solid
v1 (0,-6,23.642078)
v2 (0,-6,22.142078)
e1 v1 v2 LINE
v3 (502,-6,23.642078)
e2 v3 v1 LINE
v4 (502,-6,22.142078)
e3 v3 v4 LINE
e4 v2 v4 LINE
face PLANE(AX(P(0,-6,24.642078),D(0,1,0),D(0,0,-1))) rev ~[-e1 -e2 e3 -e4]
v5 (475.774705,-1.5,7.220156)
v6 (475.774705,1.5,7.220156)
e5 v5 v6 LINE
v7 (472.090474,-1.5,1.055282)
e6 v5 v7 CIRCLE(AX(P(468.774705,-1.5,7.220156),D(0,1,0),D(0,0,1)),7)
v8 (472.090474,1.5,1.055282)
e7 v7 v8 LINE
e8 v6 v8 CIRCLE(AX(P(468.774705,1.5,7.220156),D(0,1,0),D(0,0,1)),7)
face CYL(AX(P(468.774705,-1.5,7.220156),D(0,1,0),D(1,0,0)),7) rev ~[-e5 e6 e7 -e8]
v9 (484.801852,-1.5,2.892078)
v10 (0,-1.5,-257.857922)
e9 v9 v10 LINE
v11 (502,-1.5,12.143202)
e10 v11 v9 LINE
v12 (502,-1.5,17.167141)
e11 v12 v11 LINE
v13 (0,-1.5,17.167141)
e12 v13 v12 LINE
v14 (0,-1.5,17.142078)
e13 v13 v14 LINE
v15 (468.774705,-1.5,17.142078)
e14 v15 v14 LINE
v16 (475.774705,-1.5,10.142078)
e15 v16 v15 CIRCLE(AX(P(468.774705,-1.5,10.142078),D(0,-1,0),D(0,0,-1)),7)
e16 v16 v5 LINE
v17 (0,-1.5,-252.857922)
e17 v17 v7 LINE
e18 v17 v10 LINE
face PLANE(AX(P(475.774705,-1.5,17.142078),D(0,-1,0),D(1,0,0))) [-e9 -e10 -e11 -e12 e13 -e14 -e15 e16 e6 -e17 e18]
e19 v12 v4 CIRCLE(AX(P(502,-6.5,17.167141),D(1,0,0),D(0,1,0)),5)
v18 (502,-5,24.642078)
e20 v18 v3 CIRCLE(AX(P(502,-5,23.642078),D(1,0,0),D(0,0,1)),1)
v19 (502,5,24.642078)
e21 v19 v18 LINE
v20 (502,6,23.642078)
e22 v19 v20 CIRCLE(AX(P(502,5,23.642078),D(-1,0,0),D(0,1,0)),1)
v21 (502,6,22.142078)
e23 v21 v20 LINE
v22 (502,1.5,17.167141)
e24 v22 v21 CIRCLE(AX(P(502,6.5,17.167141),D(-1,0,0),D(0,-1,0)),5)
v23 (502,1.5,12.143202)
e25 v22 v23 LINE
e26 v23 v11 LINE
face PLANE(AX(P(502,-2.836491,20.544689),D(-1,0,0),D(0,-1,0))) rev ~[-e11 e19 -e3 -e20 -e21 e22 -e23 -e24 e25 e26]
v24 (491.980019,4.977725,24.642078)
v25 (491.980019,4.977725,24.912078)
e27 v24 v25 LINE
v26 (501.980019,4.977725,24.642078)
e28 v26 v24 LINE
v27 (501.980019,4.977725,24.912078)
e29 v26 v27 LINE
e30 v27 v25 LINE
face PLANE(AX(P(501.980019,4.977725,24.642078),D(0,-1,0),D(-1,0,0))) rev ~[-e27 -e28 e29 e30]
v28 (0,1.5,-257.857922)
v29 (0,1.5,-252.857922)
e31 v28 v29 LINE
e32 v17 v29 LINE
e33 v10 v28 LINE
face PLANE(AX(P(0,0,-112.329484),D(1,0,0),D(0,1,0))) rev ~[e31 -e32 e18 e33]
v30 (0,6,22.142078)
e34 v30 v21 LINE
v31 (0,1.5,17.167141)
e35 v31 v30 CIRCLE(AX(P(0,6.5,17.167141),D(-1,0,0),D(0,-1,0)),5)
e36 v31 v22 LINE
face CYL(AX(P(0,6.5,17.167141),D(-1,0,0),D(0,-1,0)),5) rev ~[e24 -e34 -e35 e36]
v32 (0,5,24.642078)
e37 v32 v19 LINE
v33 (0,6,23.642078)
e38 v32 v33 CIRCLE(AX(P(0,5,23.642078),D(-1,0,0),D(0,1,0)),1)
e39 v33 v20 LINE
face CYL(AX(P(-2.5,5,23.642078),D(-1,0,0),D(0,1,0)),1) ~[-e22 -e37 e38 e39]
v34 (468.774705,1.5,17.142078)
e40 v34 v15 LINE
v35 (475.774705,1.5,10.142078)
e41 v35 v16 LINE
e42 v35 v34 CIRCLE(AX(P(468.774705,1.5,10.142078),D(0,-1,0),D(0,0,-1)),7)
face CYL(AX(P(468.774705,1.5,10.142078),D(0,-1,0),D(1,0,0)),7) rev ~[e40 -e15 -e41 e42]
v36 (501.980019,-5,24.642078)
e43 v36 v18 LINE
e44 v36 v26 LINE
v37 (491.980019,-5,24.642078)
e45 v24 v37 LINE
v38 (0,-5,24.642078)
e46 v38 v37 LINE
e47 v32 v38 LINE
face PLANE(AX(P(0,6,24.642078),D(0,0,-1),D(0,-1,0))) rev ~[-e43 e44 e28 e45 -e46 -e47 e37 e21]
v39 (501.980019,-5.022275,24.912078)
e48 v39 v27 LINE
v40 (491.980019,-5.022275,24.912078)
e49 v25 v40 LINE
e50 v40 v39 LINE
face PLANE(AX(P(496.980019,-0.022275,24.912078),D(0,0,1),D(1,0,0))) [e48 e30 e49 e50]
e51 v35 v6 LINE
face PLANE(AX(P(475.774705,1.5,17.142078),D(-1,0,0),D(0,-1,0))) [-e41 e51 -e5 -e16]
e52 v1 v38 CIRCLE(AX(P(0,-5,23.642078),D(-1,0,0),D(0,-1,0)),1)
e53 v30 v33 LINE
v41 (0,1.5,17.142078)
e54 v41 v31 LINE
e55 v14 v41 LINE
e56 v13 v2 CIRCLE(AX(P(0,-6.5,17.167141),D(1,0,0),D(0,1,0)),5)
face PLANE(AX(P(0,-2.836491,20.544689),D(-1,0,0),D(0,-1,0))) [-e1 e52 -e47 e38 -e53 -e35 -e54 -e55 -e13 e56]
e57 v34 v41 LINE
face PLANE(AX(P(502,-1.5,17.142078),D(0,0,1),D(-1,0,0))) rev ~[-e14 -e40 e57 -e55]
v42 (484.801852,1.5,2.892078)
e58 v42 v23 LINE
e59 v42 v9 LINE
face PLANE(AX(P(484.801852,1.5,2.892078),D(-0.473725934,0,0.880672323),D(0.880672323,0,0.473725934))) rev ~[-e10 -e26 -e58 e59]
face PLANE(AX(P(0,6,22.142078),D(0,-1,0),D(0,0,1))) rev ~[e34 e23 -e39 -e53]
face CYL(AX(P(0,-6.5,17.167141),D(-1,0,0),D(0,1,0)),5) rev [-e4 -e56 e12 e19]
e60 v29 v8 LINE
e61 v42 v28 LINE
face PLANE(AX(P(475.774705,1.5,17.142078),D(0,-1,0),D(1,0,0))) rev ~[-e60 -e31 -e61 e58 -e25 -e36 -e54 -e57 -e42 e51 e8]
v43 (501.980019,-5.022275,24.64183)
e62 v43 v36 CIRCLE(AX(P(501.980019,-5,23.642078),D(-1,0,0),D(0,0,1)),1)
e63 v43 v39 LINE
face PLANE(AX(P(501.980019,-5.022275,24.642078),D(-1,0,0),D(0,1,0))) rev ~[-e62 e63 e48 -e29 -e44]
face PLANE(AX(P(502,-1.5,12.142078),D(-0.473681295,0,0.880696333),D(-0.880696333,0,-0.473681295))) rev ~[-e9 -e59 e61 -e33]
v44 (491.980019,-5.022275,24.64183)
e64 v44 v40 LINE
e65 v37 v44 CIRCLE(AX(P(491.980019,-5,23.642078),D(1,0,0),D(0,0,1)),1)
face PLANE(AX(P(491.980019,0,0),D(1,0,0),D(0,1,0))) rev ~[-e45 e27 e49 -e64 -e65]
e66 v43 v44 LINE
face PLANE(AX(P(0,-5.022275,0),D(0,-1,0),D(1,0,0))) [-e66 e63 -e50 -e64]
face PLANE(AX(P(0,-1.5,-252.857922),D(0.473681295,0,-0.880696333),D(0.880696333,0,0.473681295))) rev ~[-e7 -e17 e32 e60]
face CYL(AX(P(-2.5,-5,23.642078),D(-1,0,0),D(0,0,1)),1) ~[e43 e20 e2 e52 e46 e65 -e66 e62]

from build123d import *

# Parameters (mm, degrees)
F1_DEPTH      = 502
F3_DEPTH      = 406
F4_DEPTH      = 143
F5_W          = 26.22529459
F5_H          = 3
F6_DEPTH      = 14.25
F6_DEPTH_BACK = 0.8
F8_DEPTH      = 25
F10_DEPTH     = 0.27
F11_R         = 7
F12_R         = 7
F13_T1_DEPTH  = 502
F14_T1_DEPTH  = 502
F15_T1_DEPTH  = 507
F15_T6_DEPTH  = 507
F15_T12_DEPTH = 507
F15_T18_DEPTH = 507
F15_T25_DEPTH = 507
F15_T31_DEPTH = 507


# Not quite as in the source:
# - a fillet or chamfer that OpenCascade refuses, or shapes differently, is made with other operations: its cross-section is extruded or revolved along the edge and cut away or added
# - a feature names something its author has since deleted; it is built from what else it names


with BuildPart() as f1:
    # F0 (on Right) → F1 (new body)
    with BuildSketch(Plane.YZ):
        Polygon((6, 24.6420782059), (-6, 24.6420782059), (-6, 22.1420782059), (-1.5, 22.1420782059), (-1.5, -257.8579217941), (1.5, -257.8579217941), (1.5, 22.1420782059), (6, 22.1420782059), align=None)
    extrude(amount=F1_DEPTH)

    # F2 (on face) → F3 (cut)
    with BuildSketch(Plane.XZ.offset(1.5)):
        Polygon((0, -252.8579217941), (502, 17.1420782059), (0, 17.1420782059), align=None)
    extrude(amount=-F3_DEPTH, mode=Mode.SUBTRACT)

    # F2 (on face) → F4 (cut)
    with BuildSketch(Plane.XZ.offset(1.5)):
        Polygon((502, -257.8579217941), (502, 12.1420782059), (0, -257.8579217941), align=None)
    extrude(amount=-F4_DEPTH, mode=Mode.SUBTRACT)

    # F5 (on face) → F6 (join, two sides)
    with BuildSketch(Plane(origin=(0, 0, 17.1420782059), x_dir=(1, 0, 0), z_dir=(0, 0, -1))) as f6_sk:
        with Locations((488.887352705, 0)):
            Rectangle(F5_W, F5_H)
    extrude(amount=F6_DEPTH)
    extrude(f6_sk.sketch, amount=-F6_DEPTH_BACK)

    # F7 (on face) → F8 (cut)
    with BuildSketch(Plane(origin=(0, 1.5, 0), x_dir=(-1, 0, 0), z_dir=(0, 1, 0))):
        Polygon((-484.8018518519, 2.8920782059), (-502, 12.143202126), (-502, 2.8920782059), align=None)
    extrude(amount=-F8_DEPTH, mode=Mode.SUBTRACT)

    # F9 (on face) → F10 (join)
    with BuildSketch(Plane.XY.offset(24.6420782059)):
        Polygon((501.9800190187, -5.0222751118), (501.9800190187, 4.9777248882), (497.843503952, 4.9777248882), (491.9800190187, 4.9777248882), (491.9800190187, -5.0222751118), (496.5066611767, -5.0222751118), align=None)
    extrude(amount=F10_DEPTH)

    # F11
    f11_edges = [f1.edges().sort_by_distance(p)[0] for p in [
        (475.774705, 0, 17.142078),
    ]]
    fillet(f11_edges, radius=F11_R)

    # F12
    f12_edges = [f1.edges().sort_by_distance(p)[0] for p in [
        (475.774705, 0, 3.03684),
    ]]
    fillet(f12_edges, radius=F12_R)

    # F13: fillet of radius 5 on 1 edges, made by hand

    # F13_s2 → F13_t1 (join)
    with BuildSketch(Plane.YZ):
        with BuildLine():
            ThreePointArc((1.5, 17.1671410204), (2.7919007565, 20.5212429867), (6, 22.1420782059))
            Line((6, 22.1420782059), (1.5, 22.1420782059))
            Line((1.5, 22.1420782059), (1.5, 17.1671410204))
        make_face()
    extrude(amount=F13_T1_DEPTH)

    # F14: fillet of radius 5 on 1 edges, made by hand

    # F14_s2 → F14_t1 (join)
    with BuildSketch(Plane.YZ):
        with BuildLine():
            ThreePointArc((-1.5, 17.1671410204), (-2.7919007565, 20.5212429867), (-6, 22.1420782059))
            Line((-6, 22.1420782059), (-1.5, 22.1420782059))
            Line((-1.5, 22.1420782059), (-1.5, 17.1671410204))
        make_face()
    extrude(amount=F14_T1_DEPTH)

    # F15: fillet of radius 1 on 2 edges, made by hand

    # F15_s2 → F15_t1 (cut)
    with BuildSketch(Plane.YZ.offset(-2.5)):
        with BuildLine():
            ThreePointArc((6, 23.6420782059), (5.7071067812, 24.3491849871), (5, 24.6420782059))
            Line((5, 24.6420782059), (6, 24.6420782059))
            Line((6, 24.6420782059), (6, 23.6420782059))
        make_face()
    extrude(amount=F15_T1_DEPTH, mode=Mode.SUBTRACT)


with BuildPart() as f15_tool4:
    # F15_s5 → F15_t6 (new body)
    with BuildSketch(Plane.YZ.offset(-2.5)):
        with BuildLine():
            ThreePointArc((-5, 24.6420782059), (-5.7071067812, 24.3491849871), (-6, 23.6420782059))
            Line((-6, 23.6420782059), (-6, 24.6420782059))
            Line((-6, 24.6420782059), (-5, 24.6420782059))
        make_face()
    extrude(amount=F15_T6_DEPTH)

    split(bisect_by=Plane.YZ.offset(491.9800190187), keep=Keep.BOTTOM)

    split(bisect_by=Plane.XZ.offset(5.0222751118), keep=Keep.BOTTOM)


with BuildPart() as f1_1:
    add(f1.part)

    # F15_t3: cut F15_tool4
    add(f15_tool4.part, mode=Mode.SUBTRACT)


with BuildPart() as f15_tool10:
    # F15_s11 → F15_t12 (new body)
    with BuildSketch(Plane.YZ.offset(-2.5)):
        with BuildLine():
            ThreePointArc((-5, 24.6420782059), (-5.7071067812, 24.3491849871), (-6, 23.6420782059))
            Line((-6, 23.6420782059), (-6, 24.6420782059))
            Line((-6, 24.6420782059), (-5, 24.6420782059))
        make_face()
    extrude(amount=F15_T12_DEPTH)

    split(bisect_by=Plane.YZ.offset(491.9800190187), keep=Keep.BOTTOM)

    split(bisect_by=Plane.XZ.offset(5.0222751118), keep=Keep.TOP)


with BuildPart() as f1_2:
    add(f1_1.part)

    # F15_t9: cut F15_tool10
    add(f15_tool10.part, mode=Mode.SUBTRACT)


with BuildPart() as f15_tool16:
    # F15_s17 → F15_t18 (new body)
    with BuildSketch(Plane.YZ.offset(-2.5)):
        with BuildLine():
            ThreePointArc((-5, 24.6420782059), (-5.7071067812, 24.3491849871), (-6, 23.6420782059))
            Line((-6, 23.6420782059), (-6, 24.6420782059))
            Line((-6, 24.6420782059), (-5, 24.6420782059))
        make_face()
    extrude(amount=F15_T18_DEPTH)

    split(bisect_by=Plane.YZ.offset(491.9800190187), keep=Keep.TOP)

    split(bisect_by=Plane.YZ.offset(501.9800190187), keep=Keep.BOTTOM)

    split(bisect_by=Plane.XZ.offset(5.0222751118), keep=Keep.TOP)


with BuildPart() as f1_3:
    add(f1_2.part)

    # F15_t15: cut F15_tool16
    add(f15_tool16.part, mode=Mode.SUBTRACT)


with BuildPart() as f15_tool23:
    # F15_s24 → F15_t25 (new body)
    with BuildSketch(Plane.YZ.offset(-2.5)):
        with BuildLine():
            ThreePointArc((-5, 24.6420782059), (-5.7071067812, 24.3491849871), (-6, 23.6420782059))
            Line((-6, 23.6420782059), (-6, 24.6420782059))
            Line((-6, 24.6420782059), (-5, 24.6420782059))
        make_face()
    extrude(amount=F15_T25_DEPTH)

    split(bisect_by=Plane.YZ.offset(501.9800190187), keep=Keep.TOP)

    split(bisect_by=Plane.XZ.offset(5.0222751118), keep=Keep.BOTTOM)


with BuildPart() as f1_4:
    add(f1_3.part)

    # F15_t22: cut F15_tool23
    add(f15_tool23.part, mode=Mode.SUBTRACT)


with BuildPart() as f15_tool29:
    # F15_s30 → F15_t31 (new body)
    with BuildSketch(Plane.YZ.offset(-2.5)):
        with BuildLine():
            ThreePointArc((-5, 24.6420782059), (-5.7071067812, 24.3491849871), (-6, 23.6420782059))
            Line((-6, 23.6420782059), (-6, 24.6420782059))
            Line((-6, 24.6420782059), (-5, 24.6420782059))
        make_face()
    extrude(amount=F15_T31_DEPTH)

    split(bisect_by=Plane.YZ.offset(501.9800190187), keep=Keep.TOP)

    split(bisect_by=Plane.XZ.offset(5.0222751118), keep=Keep.TOP)


with BuildPart() as f1_5:
    add(f1_4.part)

    # F15_t28: cut F15_tool29
    add(f15_tool29.part, mode=Mode.SUBTRACT)


solid = f1_5.part
